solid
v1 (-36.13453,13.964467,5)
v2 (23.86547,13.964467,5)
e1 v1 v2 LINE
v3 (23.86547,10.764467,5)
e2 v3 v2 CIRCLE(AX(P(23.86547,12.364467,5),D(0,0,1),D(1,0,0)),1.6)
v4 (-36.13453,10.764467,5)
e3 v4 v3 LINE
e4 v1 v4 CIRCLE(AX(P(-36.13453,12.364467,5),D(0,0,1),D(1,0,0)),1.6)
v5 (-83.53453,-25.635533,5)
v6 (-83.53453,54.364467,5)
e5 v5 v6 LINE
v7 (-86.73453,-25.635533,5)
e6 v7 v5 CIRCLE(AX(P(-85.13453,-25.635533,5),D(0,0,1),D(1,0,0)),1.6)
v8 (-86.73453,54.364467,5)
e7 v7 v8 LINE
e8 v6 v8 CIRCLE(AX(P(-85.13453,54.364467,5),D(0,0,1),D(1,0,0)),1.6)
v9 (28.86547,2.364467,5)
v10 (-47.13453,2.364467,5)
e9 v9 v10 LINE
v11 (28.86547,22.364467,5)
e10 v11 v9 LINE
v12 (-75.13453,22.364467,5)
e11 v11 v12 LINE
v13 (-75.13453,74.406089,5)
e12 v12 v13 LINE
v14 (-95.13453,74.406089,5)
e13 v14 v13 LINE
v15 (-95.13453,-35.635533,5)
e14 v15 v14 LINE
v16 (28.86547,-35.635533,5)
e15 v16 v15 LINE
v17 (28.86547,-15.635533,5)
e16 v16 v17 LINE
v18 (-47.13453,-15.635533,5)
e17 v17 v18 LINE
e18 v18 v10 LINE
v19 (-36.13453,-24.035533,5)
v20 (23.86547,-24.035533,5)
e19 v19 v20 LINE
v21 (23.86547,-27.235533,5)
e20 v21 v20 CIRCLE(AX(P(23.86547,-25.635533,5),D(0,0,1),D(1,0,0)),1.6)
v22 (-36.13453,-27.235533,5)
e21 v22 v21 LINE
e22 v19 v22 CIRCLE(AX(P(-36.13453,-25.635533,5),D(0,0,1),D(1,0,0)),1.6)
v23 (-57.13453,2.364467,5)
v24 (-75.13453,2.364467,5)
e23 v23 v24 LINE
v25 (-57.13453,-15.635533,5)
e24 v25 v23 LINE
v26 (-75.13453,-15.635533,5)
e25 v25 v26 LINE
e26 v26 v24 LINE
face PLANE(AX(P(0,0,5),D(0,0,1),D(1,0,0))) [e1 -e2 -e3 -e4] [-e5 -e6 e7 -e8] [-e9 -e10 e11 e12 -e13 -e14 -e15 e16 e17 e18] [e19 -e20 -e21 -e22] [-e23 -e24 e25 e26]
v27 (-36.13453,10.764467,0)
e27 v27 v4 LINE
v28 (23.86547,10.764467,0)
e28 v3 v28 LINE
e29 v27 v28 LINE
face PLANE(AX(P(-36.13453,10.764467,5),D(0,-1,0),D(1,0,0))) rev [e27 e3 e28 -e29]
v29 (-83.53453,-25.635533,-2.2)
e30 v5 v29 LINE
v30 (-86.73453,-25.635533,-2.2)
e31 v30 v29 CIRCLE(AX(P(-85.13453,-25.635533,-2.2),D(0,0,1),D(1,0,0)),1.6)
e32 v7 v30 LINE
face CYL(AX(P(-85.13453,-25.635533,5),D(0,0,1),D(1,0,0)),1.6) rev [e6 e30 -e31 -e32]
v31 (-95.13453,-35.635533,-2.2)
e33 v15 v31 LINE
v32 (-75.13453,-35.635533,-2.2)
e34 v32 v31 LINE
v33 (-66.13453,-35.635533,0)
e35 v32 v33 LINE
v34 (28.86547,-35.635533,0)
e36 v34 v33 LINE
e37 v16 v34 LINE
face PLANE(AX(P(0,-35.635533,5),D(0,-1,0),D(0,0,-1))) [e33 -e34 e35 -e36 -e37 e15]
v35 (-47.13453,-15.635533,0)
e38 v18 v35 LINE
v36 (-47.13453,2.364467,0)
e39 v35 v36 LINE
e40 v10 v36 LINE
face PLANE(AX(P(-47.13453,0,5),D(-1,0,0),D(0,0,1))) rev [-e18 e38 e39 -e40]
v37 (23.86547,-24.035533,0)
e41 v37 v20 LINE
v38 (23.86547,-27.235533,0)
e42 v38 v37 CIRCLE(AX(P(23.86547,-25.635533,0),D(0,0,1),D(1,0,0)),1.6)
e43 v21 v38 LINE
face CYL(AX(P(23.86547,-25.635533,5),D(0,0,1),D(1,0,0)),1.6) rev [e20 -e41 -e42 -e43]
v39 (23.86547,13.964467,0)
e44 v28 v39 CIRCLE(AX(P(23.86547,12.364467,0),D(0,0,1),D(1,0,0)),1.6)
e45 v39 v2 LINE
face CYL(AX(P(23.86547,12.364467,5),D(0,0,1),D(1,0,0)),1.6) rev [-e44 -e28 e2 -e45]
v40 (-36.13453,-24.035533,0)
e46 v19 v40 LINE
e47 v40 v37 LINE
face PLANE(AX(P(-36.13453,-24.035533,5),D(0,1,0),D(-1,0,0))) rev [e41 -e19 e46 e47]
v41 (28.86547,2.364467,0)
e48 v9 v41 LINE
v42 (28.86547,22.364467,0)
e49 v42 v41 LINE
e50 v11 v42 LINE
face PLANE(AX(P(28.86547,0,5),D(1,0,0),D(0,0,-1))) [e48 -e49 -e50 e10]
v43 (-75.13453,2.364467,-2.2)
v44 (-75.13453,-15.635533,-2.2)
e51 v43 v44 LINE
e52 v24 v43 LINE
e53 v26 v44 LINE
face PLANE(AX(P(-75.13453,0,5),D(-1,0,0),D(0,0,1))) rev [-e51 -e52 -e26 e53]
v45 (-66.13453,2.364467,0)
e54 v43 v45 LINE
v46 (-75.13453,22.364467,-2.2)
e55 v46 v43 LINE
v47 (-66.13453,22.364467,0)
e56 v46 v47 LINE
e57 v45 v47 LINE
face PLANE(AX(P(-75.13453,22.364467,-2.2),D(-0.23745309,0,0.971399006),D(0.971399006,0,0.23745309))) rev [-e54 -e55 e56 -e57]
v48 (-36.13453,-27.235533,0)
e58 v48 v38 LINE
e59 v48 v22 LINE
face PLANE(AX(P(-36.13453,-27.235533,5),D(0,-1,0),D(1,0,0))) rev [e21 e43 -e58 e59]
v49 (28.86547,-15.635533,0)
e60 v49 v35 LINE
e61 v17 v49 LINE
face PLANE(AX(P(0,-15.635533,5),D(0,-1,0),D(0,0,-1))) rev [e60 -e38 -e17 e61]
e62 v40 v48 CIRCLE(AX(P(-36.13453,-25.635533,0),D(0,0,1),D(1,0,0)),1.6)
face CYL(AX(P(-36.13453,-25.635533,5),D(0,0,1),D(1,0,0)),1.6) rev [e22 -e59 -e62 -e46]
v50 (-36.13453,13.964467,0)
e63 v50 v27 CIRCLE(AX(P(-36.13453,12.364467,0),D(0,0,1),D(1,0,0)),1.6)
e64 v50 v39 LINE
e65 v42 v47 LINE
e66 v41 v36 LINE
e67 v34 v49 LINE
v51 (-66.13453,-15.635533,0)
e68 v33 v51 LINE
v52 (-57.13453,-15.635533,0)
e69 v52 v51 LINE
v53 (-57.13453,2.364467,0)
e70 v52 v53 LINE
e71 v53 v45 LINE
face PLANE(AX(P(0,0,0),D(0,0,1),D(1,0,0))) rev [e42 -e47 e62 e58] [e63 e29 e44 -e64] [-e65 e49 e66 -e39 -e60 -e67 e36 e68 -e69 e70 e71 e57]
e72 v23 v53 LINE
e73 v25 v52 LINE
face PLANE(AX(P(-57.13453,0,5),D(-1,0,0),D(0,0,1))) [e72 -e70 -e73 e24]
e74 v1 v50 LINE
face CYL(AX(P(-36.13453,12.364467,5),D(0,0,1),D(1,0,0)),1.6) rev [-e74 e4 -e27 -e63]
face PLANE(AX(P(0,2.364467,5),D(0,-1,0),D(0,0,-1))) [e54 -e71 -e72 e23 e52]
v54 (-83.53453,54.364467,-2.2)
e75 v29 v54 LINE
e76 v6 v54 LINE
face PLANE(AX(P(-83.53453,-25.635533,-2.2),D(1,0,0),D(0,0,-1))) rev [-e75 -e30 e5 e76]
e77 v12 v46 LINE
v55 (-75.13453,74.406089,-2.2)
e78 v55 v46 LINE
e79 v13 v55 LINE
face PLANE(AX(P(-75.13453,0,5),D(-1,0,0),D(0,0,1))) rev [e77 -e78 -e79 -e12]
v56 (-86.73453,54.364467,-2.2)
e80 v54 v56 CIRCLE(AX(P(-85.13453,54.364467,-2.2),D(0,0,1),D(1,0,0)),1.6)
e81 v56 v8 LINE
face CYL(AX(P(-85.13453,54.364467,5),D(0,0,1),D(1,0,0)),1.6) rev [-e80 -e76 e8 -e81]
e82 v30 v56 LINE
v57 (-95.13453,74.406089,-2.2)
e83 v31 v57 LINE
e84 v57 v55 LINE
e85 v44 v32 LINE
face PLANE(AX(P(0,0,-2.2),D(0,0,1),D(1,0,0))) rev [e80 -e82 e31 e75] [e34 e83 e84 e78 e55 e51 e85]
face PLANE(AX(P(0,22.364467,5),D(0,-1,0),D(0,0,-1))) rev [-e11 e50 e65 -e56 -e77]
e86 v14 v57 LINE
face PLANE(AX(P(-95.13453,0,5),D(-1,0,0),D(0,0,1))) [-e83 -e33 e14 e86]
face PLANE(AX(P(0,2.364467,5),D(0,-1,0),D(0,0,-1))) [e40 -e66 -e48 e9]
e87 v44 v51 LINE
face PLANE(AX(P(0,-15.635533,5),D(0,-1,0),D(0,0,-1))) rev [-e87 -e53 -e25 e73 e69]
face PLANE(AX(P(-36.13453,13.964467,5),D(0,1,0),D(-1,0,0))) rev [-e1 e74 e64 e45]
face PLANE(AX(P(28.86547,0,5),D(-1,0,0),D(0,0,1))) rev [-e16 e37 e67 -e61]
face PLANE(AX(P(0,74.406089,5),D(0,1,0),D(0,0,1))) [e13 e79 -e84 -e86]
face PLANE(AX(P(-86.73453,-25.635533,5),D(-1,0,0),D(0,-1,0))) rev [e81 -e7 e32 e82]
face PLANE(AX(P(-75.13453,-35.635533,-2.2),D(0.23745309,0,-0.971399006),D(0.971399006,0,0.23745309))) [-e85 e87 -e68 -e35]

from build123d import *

# Parameters (mm, degrees)
SKETCH_1_W                  = 76
SKETCH_1_H                  = 20
SKETCH_1_W_2                = 18
SKETCH_1_W_3                = 10
SKETCH_1_H_2                = 18
SKETCH_1_W_4                = 20
SKETCH_1_H_3                = 52.041621827
EXTRUDE_1_DEPTH             = 5
HOLE_WIZARD_3_2_3_2_1_DEPTH = 5
SKETCH_8_W                  = 20
SKETCH_8_H                  = 110.041621827
EXTRUDE_2_DEPTH             = 2.2
HOLE_START                  = -2.2
HOLE_WIZARD_3_2_3_2_3_DEPTH = 7.2
RIB_1_REACH                 = 147.55
SKETCH_11_WALL_W            = 302.364540162
SKETCH_11_WALL_H            = 20
RIB_2_REACH                 = 113.533
SKETCH_12_WALL_W            = 234.330707354
SKETCH_12_WALL_H            = 20


# Read off the part's stored shape, not the designer's step: Ø3.2 (3.2) 直径槽口1, Ø3.2 (3.2) 直径槽口3
with BuildPart() as part:
    # 草图1 → 凸台-拉伸1 (new body)
    with BuildSketch(Plane.XY):
        with Locations((-9.134530028, -25.635533007)):
            Rectangle(SKETCH_1_W, SKETCH_1_H)
        with Locations((-66.134530028, -25.635533007)):
            Rectangle(SKETCH_1_W_2, SKETCH_1_H)
        with Locations((-52.134530028, -25.635533007)):
            Rectangle(SKETCH_1_W_3, SKETCH_1_H)
        with Locations((-66.134530028, 12.364466993)):
            Rectangle(SKETCH_1_W_2, SKETCH_1_H)
        with Locations((-9.134530028, 12.364466993)):
            Rectangle(SKETCH_1_W, SKETCH_1_H)
        with Locations((-52.134530028, 12.364466993)):
            Rectangle(SKETCH_1_W_3, SKETCH_1_H)
        with Locations((-52.134530028, -6.635533007)):
            Rectangle(SKETCH_1_W_3, SKETCH_1_H_2)
        with Locations((-85.134530028, 12.364466993)):
            Rectangle(SKETCH_1_W_4, SKETCH_1_H)
        with Locations((-85.134530028, -6.635533007)):
            Rectangle(SKETCH_1_W_4, SKETCH_1_H_2)
        with Locations((-85.134530028, -25.635533007)):
            Rectangle(SKETCH_1_W_4, SKETCH_1_H)
        with Locations((-85.134530028, 48.385277907)):
            Rectangle(SKETCH_1_W_4, SKETCH_1_H_3)
    extrude(amount=EXTRUDE_1_DEPTH)

    # Ø3.2 (3.2) 直径槽口1 outline → Ø3.2 (3.2) 直径槽口1 (cut)
    with BuildSketch(Plane.XY):
        with BuildLine():
            Line((-36.134530028, 10.764466993), (23.865469972, 10.764466993))
            ThreePointArc((23.865469972, 10.764466993), (25.465469972, 12.364466993), (23.865469972, 13.964466993))
            Line((23.865469972, 13.964466993), (-36.134530028, 13.964466993))
            ThreePointArc((-36.134530028, 13.964466993), (-37.734530028, 12.364466993), (-36.134530028, 10.764466993))
        make_face()
        with BuildLine():
            Line((-36.134530028, -27.235533007), (23.865469972, -27.235533007))
            ThreePointArc((23.865469972, -27.235533007), (25.465469972, -25.635533007), (23.865469972, -24.035533007))
            Line((23.865469972, -24.035533007), (-36.134530028, -24.035533007))
            ThreePointArc((-36.134530028, -24.035533007), (-37.734530028, -25.635533007), (-36.134530028, -27.235533007))
        make_face()
    extrude(amount=HOLE_WIZARD_3_2_3_2_1_DEPTH, mode=Mode.SUBTRACT)

    # 草图8 → 凸台-拉伸2 (add)
    with BuildSketch(Plane(origin=(0, 0, 0), x_dir=(-1, 0, 0), z_dir=(0, 0, -1))):
        with Locations((85.134530028, 19.385277907)):
            Rectangle(SKETCH_8_W, SKETCH_8_H)
    extrude(amount=EXTRUDE_2_DEPTH)

    # Ø3.2 (3.2) 直径槽口3 outline → Ø3.2 (3.2) 直径槽口3 (cut)
    with BuildSketch(Plane.XY.offset(HOLE_START)):
        with BuildLine():
            Line((-83.534530028, -25.635533007), (-83.534530028, 54.364466993))
            ThreePointArc((-83.534530028, 54.364466993), (-85.134530028, 55.964466993), (-86.734530028, 54.364466993))
            Line((-86.734530028, 54.364466993), (-86.734530028, -25.635533007))
            ThreePointArc((-86.734530028, -25.635533007), (-85.134530028, -27.235533007), (-83.534530028, -25.635533007))
        make_face()
    extrude(amount=HOLE_WIZARD_3_2_3_2_3_DEPTH, mode=Mode.SUBTRACT)

    # 草图11 wall → 筋1 (add, up to next)
    with BuildSketch(Plane(origin=(-70.634530028, -35.635533007, -1.1), x_dir=(0.971399006497, 0, 0.237453090477), z_dir=(-0.237453090477, 0, 0.971399006497)), mode=Mode.PRIVATE) as rib_1_sk1:
        with Locations((0, 10)):
            Rectangle(SKETCH_11_WALL_W, SKETCH_11_WALL_H)
    rib_1_tool1 = extrude(rib_1_sk1.sketch, amount=RIB_1_REACH, mode=Mode.PRIVATE) - part.part
    add(rib_1_tool1.solids().sort_by_distance((-70.634530028, -35.635533007, -1.1))[0])

    # 草图12 wall → 筋2 (add, up to next)
    with BuildSketch(Plane(origin=(-70.634530028, 22.364466993, -1.1), x_dir=(0.971399006497, 0, 0.237453090477), z_dir=(0.237453090477, 0, -0.971399006497)), mode=Mode.PRIVATE) as rib_2_sk1:
        with Locations((0, 10)):
            Rectangle(SKETCH_12_WALL_W, SKETCH_12_WALL_H)
    rib_2_tool1 = extrude(rib_2_sk1.sketch, amount=-RIB_2_REACH, mode=Mode.PRIVATE) - part.part
    add(rib_2_tool1.solids().sort_by_distance((-70.634530028, 22.364466993, -1.1))[0])


solid = part.part
